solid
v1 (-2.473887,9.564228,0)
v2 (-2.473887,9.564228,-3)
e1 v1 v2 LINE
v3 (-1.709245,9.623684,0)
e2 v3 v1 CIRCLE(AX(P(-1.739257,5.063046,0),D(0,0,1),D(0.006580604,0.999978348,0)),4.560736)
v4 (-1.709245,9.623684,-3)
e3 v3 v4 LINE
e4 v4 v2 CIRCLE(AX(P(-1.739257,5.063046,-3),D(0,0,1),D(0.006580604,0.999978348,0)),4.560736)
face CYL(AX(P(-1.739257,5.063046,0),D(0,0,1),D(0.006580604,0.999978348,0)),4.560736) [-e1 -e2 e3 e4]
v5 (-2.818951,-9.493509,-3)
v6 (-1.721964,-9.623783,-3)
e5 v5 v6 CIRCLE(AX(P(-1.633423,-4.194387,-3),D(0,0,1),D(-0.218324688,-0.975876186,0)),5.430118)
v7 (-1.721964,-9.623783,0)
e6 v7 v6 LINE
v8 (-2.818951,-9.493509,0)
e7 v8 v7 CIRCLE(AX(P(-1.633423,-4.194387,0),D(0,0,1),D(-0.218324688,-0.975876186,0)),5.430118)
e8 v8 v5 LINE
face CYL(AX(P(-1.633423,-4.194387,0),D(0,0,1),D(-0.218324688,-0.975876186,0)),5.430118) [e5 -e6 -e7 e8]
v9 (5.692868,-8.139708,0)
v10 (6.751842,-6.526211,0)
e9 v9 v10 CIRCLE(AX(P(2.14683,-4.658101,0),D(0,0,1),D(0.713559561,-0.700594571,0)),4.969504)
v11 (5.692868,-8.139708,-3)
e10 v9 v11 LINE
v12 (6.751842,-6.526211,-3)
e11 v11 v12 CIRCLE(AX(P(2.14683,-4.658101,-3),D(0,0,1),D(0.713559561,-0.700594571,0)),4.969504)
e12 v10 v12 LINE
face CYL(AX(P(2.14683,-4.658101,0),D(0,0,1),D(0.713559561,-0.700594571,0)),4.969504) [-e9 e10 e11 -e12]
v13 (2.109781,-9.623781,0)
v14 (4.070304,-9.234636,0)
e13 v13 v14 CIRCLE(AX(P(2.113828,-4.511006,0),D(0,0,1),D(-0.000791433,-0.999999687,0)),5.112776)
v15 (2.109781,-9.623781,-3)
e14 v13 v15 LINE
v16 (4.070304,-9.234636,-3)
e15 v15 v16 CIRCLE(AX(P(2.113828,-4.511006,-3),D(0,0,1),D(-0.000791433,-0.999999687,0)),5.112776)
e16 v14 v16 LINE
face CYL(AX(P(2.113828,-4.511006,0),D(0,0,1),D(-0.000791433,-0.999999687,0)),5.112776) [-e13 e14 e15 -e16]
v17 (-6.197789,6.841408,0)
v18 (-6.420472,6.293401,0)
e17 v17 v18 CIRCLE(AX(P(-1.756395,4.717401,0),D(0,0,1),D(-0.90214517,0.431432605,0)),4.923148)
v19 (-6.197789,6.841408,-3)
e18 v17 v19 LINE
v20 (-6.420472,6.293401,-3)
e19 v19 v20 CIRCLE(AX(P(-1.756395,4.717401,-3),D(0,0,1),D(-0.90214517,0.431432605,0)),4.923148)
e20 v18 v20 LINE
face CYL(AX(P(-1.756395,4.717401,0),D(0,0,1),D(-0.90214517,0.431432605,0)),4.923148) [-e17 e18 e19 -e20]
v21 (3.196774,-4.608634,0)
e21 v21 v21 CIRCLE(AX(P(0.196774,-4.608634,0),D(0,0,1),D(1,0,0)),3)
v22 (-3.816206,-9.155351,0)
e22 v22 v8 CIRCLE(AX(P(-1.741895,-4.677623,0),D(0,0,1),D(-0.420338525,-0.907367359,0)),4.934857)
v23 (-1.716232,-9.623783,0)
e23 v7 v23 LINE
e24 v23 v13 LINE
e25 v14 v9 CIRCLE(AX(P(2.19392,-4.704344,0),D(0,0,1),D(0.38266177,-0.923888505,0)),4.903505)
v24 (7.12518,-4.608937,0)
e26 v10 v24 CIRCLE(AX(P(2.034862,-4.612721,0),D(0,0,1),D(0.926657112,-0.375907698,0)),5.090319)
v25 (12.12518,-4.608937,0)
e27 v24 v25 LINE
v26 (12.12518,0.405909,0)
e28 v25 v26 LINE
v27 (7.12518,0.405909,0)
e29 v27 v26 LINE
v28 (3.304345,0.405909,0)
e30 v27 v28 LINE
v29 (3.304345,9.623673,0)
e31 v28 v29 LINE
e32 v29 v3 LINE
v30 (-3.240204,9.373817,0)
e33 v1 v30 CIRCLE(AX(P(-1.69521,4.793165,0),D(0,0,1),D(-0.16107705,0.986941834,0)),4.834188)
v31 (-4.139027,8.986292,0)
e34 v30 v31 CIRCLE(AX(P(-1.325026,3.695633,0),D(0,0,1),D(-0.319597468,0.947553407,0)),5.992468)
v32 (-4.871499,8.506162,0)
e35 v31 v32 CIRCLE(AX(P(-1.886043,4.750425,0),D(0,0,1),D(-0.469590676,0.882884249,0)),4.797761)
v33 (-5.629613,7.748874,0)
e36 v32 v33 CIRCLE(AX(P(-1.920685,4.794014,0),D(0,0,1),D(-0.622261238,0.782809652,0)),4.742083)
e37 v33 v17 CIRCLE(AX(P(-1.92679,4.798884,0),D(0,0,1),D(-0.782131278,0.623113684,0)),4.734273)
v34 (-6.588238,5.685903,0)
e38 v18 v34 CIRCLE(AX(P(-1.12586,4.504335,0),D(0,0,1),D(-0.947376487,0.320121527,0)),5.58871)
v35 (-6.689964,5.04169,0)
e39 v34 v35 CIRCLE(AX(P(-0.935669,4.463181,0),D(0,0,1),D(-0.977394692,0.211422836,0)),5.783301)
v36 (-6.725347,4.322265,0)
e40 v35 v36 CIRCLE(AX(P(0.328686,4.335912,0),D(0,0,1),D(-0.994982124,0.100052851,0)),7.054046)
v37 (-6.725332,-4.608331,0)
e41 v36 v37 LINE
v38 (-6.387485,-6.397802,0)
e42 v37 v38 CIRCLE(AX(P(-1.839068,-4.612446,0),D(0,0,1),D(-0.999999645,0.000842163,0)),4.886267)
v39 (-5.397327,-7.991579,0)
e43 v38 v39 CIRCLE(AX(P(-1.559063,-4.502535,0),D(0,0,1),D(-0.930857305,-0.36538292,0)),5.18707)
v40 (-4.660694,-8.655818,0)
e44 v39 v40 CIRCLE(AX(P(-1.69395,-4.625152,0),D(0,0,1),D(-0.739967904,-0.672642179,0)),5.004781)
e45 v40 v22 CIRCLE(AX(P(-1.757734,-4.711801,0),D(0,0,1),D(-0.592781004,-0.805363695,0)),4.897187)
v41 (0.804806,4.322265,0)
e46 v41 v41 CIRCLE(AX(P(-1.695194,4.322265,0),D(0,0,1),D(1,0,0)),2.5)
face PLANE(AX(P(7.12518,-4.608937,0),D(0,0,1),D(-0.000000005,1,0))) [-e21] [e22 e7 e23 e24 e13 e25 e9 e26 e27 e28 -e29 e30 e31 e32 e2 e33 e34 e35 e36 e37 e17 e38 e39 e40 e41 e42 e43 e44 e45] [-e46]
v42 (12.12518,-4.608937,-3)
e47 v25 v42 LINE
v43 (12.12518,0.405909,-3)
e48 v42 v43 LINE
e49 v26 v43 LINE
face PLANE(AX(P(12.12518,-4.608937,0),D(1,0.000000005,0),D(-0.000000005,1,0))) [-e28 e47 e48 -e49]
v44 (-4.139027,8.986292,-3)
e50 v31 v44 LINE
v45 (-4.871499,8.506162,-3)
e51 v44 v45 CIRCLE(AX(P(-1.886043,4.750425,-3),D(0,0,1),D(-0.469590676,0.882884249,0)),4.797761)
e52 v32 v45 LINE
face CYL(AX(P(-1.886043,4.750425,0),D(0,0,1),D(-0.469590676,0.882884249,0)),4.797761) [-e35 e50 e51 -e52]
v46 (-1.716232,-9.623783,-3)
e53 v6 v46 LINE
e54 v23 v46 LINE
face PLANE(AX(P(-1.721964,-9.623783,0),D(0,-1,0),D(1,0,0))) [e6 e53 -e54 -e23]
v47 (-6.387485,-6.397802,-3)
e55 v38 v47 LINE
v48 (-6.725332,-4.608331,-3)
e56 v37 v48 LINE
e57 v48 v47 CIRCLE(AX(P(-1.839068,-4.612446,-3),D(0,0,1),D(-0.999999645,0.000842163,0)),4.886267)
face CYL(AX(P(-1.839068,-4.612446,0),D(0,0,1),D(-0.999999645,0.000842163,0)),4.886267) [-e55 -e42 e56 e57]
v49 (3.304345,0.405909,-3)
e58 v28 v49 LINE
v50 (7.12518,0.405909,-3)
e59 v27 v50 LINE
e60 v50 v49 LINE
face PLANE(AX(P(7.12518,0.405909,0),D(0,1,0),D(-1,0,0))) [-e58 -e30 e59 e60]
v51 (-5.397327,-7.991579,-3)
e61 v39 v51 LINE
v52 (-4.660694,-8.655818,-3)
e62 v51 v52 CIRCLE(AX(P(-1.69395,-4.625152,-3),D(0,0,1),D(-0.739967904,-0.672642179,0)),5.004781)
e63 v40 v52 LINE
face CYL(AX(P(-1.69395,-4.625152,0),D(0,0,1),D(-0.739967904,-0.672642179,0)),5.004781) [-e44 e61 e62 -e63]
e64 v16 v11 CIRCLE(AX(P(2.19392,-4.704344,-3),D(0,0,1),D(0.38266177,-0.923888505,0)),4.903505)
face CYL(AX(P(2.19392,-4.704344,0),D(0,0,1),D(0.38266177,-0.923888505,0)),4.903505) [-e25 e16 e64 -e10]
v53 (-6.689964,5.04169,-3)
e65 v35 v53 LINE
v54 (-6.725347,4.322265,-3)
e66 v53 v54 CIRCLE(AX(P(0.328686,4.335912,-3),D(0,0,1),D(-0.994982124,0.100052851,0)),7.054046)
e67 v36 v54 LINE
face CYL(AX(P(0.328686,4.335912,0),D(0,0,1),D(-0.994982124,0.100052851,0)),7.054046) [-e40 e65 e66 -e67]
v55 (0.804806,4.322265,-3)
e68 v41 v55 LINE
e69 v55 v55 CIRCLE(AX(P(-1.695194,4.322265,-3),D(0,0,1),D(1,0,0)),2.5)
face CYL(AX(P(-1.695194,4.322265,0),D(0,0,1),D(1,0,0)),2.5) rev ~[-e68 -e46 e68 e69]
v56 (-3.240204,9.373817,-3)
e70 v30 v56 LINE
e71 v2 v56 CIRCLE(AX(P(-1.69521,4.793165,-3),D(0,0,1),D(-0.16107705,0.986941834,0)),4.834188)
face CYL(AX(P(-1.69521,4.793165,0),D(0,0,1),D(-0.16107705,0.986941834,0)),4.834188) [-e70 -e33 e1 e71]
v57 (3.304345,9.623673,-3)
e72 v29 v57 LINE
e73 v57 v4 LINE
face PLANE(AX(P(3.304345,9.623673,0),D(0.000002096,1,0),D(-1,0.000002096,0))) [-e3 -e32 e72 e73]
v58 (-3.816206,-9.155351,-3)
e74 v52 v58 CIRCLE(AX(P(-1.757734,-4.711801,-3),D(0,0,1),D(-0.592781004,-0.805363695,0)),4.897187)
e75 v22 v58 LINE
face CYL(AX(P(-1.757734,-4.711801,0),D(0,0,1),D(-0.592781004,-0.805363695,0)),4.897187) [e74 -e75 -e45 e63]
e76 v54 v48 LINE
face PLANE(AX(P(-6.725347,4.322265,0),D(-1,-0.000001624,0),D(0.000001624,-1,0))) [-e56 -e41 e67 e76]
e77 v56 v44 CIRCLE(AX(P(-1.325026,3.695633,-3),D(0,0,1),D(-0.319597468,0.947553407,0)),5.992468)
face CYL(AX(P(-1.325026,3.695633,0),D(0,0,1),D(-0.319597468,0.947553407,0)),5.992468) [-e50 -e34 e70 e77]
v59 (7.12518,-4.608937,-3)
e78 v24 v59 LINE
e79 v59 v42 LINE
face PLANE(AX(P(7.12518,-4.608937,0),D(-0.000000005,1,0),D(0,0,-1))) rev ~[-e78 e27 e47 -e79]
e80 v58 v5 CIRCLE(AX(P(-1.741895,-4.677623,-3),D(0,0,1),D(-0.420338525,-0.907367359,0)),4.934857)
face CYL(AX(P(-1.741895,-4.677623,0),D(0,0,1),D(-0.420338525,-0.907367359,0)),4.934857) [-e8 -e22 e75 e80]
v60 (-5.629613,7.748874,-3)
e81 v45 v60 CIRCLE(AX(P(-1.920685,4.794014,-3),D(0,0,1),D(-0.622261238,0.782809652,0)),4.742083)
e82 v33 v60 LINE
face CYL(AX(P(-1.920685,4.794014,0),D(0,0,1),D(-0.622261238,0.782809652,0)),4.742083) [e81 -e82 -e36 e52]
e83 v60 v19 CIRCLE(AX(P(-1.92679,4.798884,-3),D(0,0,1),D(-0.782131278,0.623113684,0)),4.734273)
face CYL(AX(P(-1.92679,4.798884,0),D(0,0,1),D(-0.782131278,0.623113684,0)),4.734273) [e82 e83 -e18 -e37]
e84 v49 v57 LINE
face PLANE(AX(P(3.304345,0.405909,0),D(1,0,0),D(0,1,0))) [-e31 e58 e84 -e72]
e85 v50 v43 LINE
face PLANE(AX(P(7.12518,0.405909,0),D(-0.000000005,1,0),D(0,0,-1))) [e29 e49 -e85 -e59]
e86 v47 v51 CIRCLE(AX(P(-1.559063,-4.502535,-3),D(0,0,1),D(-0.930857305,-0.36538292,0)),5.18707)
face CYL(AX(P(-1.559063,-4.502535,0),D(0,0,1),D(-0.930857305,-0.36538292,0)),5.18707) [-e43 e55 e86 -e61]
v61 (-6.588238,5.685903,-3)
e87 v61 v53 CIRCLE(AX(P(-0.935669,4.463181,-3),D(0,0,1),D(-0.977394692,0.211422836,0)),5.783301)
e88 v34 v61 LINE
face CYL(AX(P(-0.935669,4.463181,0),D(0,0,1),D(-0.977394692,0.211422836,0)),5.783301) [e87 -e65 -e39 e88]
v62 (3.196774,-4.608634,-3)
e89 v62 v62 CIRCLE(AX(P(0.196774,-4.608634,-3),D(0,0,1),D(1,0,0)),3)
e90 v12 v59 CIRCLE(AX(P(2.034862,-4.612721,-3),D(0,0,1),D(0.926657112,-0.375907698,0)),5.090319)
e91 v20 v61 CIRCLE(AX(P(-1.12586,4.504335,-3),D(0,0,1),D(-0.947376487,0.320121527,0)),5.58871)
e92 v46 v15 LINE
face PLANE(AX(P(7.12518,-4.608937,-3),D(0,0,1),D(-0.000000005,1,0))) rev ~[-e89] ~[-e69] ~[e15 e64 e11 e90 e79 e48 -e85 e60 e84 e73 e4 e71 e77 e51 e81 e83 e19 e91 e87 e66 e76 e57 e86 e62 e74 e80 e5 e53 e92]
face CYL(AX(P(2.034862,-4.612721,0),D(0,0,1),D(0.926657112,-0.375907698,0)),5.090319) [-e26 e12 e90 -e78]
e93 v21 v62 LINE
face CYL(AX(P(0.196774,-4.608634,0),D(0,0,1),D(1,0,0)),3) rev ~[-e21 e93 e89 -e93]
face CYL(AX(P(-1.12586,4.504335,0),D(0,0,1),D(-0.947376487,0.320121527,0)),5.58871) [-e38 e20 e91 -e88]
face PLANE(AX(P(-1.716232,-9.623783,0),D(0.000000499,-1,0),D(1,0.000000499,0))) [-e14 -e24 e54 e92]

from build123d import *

# Parameters (mm, degrees)
F0_R     = 3
F0_R_2   = 2.5
F1_DEPTH = 3
F2_DEPTH = 5


# Not quite as in the source:
# - ends of sketch curves that miss each other by under 0.0002 mm in the source are joined


with BuildPart() as f1:
    # F0 (on Top) → F1 (new body)
    with BuildSketch(Plane.XY):
        with BuildLine():
            Line((-1.7219635134, -9.6237825349), (-1.7162322612, -9.6237825349))
            Line((-1.7162322612, -9.6237825349), (2.1097812593, -9.6237806245))
            ThreePointArc((2.1097812593, -9.6237806245), (3.109244006, -9.5259463757), (4.0703036603, -9.2346361811))
            ThreePointArc((4.0703036603, -9.2346361811), (4.9367767363, -8.7689594925), (5.6928675676, -8.1397082139))
            ThreePointArc((5.6928675676, -8.1397082139), (6.3014355553, -7.384861889), (6.7518423579, -6.5262108466))
            ThreePointArc((6.7518423579, -6.5262108466), (7.0313366054, -5.5856490766), (7.1251796223, -4.6089367858))
            Line((7.1251796223, -4.6089367858), (7.1251795967, 0.4059089633))
            Line((7.1251795967, 0.4059089633), (3.3043447402, 0.4059089633))
            Line((3.3043447402, 0.4059089633), (3.3043447402, 9.6236730545))
            Line((3.3043447402, 9.6236730545), (-1.7092449094, 9.6236835618))
            ThreePointArc((-1.7092449094, 9.6236835618), (-2.0928177445, 9.6100571875), (-2.4738865464, 9.5642275806))
            ThreePointArc((-2.4738865464, 9.5642275806), (-2.8609393666, 9.4846946207), (-3.2402037336, 9.3738166285))
            ThreePointArc((-3.2402037336, 9.3738166285), (-3.6975405848, 9.1984368029), (-4.1390265018, 8.9862923546))
            ThreePointArc((-4.1390265018, 8.9862923546), (-4.5162413892, 8.7629757089), (-4.8714990411, 8.5061617901))
            ThreePointArc((-4.8714990411, 8.5061617901), (-5.2720148148, 8.1490003263), (-5.6296128286, 7.7488742742))
            ThreePointArc((-5.6296128286, 7.7488742742), (-5.9394367718, 7.3112544614), (-6.197789407, 6.8414078072))
            ThreePointArc((-6.197789407, 6.8414078072), (-6.3173685837, 6.5707517714), (-6.4204719372, 6.2934007888))
            ThreePointArc((-6.4204719372, 6.2934007888), (-6.5129249786, 5.9920188156), (-6.5882375678, 5.6859033621))
            ThreePointArc((-6.5882375678, 5.6859033621), (-6.6481890942, 5.3652316519), (-6.6899638063, 5.0416896752))
            ThreePointArc((-6.6899638063, 5.0416896752), (-6.7168439977, 4.6824291061), (-6.7253469337, 4.3222646908))
            Line((-6.7253469337, 4.3222646908), (-6.7253324298, -4.6083307059))
            ThreePointArc((-6.7253324298, -4.6083307059), (-6.6405112105, -5.5189445936), (-6.3874853783, -6.3978019019))
            ThreePointArc((-6.3874853783, -6.3978019019), (-5.9650696712, -7.2398337428), (-5.3973270448, -7.9915790132))
            ThreePointArc((-5.3973270448, -7.9915790132), (-5.0455065065, -8.3419922854), (-4.6606937322, -8.6558175446))
            ThreePointArc((-4.6606937322, -8.6558175446), (-4.2509916029, -8.9267871137), (-3.8162055499, -9.1553509281))
            ThreePointArc((-3.8162055499, -9.1553509281), (-3.3266240966, -9.3511061983), (-2.8189514749, -9.4935092865))
            ThreePointArc((-2.8189514749, -9.4935092865), (-2.2737789347, -9.586614675), (-1.7219635134, -9.6237825349))
        make_face()
        with Locations((0.1967744991, -4.6086336082)):
            Circle(F0_R, mode=Mode.SUBTRACT)
        with Locations((-1.6951942668, 4.3222646911)):
            Circle(F0_R_2, mode=Mode.SUBTRACT)
    extrude(amount=-F1_DEPTH)

    # F2 (add): a face of the model
    f2_faces = [f1.faces().sort_by_distance(p)[0] for p in [
        (7.1251796095, -2.1015139113, -1.5),
    ]]
    extrude(f2_faces, amount=F2_DEPTH)


solid = f1.part
